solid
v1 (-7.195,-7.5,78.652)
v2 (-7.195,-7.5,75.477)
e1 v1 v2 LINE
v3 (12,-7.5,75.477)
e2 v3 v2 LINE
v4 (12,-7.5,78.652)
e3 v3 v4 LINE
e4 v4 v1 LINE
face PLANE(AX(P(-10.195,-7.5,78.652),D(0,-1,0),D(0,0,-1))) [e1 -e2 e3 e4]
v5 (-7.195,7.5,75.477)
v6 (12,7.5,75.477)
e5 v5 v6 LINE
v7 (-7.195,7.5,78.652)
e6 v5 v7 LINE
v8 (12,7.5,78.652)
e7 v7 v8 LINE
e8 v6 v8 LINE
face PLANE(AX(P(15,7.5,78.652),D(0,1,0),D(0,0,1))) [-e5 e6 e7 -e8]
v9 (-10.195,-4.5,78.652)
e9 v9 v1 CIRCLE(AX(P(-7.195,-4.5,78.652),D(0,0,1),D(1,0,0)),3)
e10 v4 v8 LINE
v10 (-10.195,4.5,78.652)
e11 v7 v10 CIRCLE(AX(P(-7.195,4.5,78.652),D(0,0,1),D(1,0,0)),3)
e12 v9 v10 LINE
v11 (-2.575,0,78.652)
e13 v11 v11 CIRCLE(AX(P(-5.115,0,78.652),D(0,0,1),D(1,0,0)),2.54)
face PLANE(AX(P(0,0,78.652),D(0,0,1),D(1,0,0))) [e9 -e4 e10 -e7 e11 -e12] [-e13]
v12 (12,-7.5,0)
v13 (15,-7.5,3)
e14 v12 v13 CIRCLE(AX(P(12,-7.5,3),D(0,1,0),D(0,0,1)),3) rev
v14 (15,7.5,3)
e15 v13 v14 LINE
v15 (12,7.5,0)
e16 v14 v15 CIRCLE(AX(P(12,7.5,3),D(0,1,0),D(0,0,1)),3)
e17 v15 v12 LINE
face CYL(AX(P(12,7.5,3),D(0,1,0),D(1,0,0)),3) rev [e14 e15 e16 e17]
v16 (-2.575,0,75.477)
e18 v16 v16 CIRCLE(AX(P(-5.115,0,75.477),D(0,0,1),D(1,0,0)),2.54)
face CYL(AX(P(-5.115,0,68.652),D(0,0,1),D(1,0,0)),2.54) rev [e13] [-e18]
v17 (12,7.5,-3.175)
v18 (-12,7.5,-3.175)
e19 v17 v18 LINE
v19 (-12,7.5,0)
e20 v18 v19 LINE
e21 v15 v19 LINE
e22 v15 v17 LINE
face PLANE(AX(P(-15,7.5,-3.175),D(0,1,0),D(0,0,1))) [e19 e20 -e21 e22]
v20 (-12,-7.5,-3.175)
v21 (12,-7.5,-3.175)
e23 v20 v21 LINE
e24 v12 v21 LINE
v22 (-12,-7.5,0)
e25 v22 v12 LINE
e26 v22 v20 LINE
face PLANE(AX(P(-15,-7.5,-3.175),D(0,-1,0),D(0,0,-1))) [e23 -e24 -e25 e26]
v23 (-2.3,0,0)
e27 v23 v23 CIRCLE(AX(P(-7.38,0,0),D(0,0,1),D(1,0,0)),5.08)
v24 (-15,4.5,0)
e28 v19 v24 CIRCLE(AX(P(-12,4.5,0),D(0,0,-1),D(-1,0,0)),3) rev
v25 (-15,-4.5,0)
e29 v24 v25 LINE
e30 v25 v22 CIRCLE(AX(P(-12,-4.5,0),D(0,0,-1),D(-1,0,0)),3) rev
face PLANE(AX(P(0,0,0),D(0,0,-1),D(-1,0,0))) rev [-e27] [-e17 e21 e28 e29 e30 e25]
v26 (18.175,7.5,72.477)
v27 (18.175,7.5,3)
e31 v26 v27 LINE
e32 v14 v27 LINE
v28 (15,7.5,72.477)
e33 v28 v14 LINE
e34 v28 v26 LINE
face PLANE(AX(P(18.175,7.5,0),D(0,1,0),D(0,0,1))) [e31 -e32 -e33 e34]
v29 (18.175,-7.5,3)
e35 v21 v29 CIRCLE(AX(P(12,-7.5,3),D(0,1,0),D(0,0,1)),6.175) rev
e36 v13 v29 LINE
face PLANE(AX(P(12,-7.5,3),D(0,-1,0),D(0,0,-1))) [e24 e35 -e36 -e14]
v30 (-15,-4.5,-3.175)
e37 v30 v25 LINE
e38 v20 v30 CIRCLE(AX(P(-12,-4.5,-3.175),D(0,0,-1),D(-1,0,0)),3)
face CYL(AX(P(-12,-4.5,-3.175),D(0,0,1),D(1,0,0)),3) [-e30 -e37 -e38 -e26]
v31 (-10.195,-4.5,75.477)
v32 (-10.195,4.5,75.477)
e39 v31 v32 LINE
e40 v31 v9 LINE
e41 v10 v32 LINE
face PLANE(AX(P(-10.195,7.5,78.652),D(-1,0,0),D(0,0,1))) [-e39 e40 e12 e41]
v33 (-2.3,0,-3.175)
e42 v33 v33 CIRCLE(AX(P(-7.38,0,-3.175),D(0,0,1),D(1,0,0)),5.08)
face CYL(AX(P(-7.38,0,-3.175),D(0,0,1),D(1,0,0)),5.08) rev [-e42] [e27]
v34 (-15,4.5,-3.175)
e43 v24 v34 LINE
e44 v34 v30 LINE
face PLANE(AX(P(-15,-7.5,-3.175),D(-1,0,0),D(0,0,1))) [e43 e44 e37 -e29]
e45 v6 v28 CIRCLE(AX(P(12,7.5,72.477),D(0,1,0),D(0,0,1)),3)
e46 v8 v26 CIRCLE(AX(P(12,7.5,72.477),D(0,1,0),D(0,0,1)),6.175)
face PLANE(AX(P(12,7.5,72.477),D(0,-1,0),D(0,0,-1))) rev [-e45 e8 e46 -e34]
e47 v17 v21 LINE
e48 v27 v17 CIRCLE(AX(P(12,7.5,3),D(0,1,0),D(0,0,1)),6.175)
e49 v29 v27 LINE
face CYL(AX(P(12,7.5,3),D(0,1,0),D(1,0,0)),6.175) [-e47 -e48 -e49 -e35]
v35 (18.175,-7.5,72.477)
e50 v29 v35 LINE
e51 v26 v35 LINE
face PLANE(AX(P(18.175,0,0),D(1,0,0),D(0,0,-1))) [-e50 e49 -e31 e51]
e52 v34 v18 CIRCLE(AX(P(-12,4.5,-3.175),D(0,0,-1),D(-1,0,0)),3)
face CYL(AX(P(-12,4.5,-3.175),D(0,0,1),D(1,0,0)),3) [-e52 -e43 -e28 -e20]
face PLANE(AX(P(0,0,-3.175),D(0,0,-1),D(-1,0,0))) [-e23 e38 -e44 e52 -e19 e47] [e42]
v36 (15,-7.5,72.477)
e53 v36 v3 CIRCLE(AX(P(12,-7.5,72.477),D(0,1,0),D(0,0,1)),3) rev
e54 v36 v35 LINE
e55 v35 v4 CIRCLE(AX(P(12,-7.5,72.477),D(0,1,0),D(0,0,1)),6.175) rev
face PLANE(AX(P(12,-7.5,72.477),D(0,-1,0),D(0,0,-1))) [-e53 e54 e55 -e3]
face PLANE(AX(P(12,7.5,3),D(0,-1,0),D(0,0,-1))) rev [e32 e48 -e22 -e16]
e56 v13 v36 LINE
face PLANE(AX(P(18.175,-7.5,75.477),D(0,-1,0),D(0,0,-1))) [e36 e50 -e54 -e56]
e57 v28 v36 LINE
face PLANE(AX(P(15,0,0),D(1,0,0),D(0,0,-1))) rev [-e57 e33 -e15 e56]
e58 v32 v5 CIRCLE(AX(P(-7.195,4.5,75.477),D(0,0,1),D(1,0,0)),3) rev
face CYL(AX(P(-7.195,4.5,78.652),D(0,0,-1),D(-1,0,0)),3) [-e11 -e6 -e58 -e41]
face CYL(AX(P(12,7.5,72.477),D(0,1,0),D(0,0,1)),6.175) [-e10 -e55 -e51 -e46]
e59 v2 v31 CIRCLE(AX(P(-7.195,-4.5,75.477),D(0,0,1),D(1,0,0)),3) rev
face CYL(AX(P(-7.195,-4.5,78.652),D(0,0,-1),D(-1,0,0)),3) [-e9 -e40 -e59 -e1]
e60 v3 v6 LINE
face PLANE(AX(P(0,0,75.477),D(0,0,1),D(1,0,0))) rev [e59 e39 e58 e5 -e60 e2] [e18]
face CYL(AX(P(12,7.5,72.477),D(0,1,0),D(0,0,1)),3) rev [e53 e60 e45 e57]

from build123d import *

# Parameters (mm, degrees)
SKETCH1_W                    = 30
SKETCH1_H                    = 15
BASE_FLANGE1_DEPTH           = 3.175
EDGE_FLANGE1_STRIP_W         = 18.7
EDGE_FLANGE1_STRIP_H         = 3.175
EDGE_FLANGE1_STRIP_CUT_DEPTH = 15
EDGE_FLANGE1_DEPTH           = 15
EDGE_FLANGE2_STRIP_W         = 18.7
EDGE_FLANGE2_STRIP_H         = 3.175
EDGE_FLANGE2_STRIP_CUT_DEPTH = 15
EDGE_FLANGE2_DEPTH           = 15
SKETCH14_R                   = 5.08
CUT_EXTRUDE1_DEPTH           = 82.072299394
SKETCH15_R                   = 2.54
CUT_EXTRUDE2_DEPTH           = 10
FILLET1_R                    = 3


# Sheet-metal steps are written as plain solids
with BuildPart() as part:
    # Sketch1 → Base-Flange1 (new body)
    with BuildSketch(Plane.XY):
        Rectangle(SKETCH1_W, SKETCH1_H)
    extrude(amount=-BASE_FLANGE1_DEPTH)

    # Edge-Flange1 strip (across the edge) → Edge-Flange1 strip cut (cut)
    with BuildSketch(Plane(origin=(15, -7.5, 0), x_dir=(-1, 0, 0), z_dir=(0, 1, 0))):
        with Locations((-6.35, -1.5875)):
            Rectangle(EDGE_FLANGE1_STRIP_W, EDGE_FLANGE1_STRIP_H)
    extrude(amount=EDGE_FLANGE1_STRIP_CUT_DEPTH, mode=Mode.SUBTRACT)

    # Edge-Flange1 section (across the edge) → Edge-Flange1 (add)
    with BuildSketch(Plane(origin=(15, -7.5, 0), x_dir=(-1, 0, 0), z_dir=(0, 1, 0))):
        with BuildLine():
            Line((-3.175, 3), (-3.175, 75.477))
            Line((-3.175, 75.477), (0, 75.477))
            Line((0, 75.477), (0, 3))
            ThreePointArc((0, 3), (0.878679656, 0.878679656), (3, 0))
            Line((3, 0), (3, -3.175))
            ThreePointArc((3, -3.175), (-1.366384374, -1.366384374), (-3.175, 3))
        make_face()
    extrude(amount=EDGE_FLANGE1_DEPTH)

    # Edge-Flange2 strip (across the edge) → Edge-Flange2 strip cut (cut)
    with BuildSketch(Plane(origin=(15, -7.5, 75.477), x_dir=(0, 0, -1), z_dir=(0, 1, 0))):
        with Locations((-6.35, -1.5875)):
            Rectangle(EDGE_FLANGE2_STRIP_W, EDGE_FLANGE2_STRIP_H)
    extrude(amount=EDGE_FLANGE2_STRIP_CUT_DEPTH, mode=Mode.SUBTRACT)

    # Edge-Flange2 section (across the edge) → Edge-Flange2 (add)
    with BuildSketch(Plane(origin=(15, -7.5, 75.477), x_dir=(0, 0, -1), z_dir=(0, 1, 0))):
        with BuildLine():
            Line((-3.175, 3), (-3.175, 25.195))
            Line((-3.175, 25.195), (0, 25.195))
            Line((0, 25.195), (0, 3))
            ThreePointArc((0, 3), (0.878679656, 0.878679656), (3, 0))
            Line((3, 0), (3, -3.175))
            ThreePointArc((3, -3.175), (-1.366384374, -1.366384374), (-3.175, 3))
        make_face()
    extrude(amount=EDGE_FLANGE2_DEPTH)

    # Sketch14 → Cut-Extrude1 (cut, through all)
    with BuildSketch(Plane.XY):
        with Locations((-7.38, 0)):
            Circle(SKETCH14_R)
    extrude(amount=-CUT_EXTRUDE1_DEPTH, mode=Mode.SUBTRACT)

    # Sketch15 → Cut-Extrude2 (cut)
    with BuildSketch(Plane.XY.offset(78.652)):
        with Locations((-5.115, 0)):
            Circle(SKETCH15_R)
    extrude(amount=-CUT_EXTRUDE2_DEPTH, mode=Mode.SUBTRACT)

    # Fillet1
    fillet1_edges = [part.edges().sort_by_distance(p)[0] for p in [
        (-10.195, -7.5, 77.0645),
        (-10.195, 7.5, 77.0645),
        (-15, -7.5, -1.5875),
        (-15, 7.5, -1.5875),
    ]]
    fillet(fillet1_edges, radius=FILLET1_R)


solid = part.part
